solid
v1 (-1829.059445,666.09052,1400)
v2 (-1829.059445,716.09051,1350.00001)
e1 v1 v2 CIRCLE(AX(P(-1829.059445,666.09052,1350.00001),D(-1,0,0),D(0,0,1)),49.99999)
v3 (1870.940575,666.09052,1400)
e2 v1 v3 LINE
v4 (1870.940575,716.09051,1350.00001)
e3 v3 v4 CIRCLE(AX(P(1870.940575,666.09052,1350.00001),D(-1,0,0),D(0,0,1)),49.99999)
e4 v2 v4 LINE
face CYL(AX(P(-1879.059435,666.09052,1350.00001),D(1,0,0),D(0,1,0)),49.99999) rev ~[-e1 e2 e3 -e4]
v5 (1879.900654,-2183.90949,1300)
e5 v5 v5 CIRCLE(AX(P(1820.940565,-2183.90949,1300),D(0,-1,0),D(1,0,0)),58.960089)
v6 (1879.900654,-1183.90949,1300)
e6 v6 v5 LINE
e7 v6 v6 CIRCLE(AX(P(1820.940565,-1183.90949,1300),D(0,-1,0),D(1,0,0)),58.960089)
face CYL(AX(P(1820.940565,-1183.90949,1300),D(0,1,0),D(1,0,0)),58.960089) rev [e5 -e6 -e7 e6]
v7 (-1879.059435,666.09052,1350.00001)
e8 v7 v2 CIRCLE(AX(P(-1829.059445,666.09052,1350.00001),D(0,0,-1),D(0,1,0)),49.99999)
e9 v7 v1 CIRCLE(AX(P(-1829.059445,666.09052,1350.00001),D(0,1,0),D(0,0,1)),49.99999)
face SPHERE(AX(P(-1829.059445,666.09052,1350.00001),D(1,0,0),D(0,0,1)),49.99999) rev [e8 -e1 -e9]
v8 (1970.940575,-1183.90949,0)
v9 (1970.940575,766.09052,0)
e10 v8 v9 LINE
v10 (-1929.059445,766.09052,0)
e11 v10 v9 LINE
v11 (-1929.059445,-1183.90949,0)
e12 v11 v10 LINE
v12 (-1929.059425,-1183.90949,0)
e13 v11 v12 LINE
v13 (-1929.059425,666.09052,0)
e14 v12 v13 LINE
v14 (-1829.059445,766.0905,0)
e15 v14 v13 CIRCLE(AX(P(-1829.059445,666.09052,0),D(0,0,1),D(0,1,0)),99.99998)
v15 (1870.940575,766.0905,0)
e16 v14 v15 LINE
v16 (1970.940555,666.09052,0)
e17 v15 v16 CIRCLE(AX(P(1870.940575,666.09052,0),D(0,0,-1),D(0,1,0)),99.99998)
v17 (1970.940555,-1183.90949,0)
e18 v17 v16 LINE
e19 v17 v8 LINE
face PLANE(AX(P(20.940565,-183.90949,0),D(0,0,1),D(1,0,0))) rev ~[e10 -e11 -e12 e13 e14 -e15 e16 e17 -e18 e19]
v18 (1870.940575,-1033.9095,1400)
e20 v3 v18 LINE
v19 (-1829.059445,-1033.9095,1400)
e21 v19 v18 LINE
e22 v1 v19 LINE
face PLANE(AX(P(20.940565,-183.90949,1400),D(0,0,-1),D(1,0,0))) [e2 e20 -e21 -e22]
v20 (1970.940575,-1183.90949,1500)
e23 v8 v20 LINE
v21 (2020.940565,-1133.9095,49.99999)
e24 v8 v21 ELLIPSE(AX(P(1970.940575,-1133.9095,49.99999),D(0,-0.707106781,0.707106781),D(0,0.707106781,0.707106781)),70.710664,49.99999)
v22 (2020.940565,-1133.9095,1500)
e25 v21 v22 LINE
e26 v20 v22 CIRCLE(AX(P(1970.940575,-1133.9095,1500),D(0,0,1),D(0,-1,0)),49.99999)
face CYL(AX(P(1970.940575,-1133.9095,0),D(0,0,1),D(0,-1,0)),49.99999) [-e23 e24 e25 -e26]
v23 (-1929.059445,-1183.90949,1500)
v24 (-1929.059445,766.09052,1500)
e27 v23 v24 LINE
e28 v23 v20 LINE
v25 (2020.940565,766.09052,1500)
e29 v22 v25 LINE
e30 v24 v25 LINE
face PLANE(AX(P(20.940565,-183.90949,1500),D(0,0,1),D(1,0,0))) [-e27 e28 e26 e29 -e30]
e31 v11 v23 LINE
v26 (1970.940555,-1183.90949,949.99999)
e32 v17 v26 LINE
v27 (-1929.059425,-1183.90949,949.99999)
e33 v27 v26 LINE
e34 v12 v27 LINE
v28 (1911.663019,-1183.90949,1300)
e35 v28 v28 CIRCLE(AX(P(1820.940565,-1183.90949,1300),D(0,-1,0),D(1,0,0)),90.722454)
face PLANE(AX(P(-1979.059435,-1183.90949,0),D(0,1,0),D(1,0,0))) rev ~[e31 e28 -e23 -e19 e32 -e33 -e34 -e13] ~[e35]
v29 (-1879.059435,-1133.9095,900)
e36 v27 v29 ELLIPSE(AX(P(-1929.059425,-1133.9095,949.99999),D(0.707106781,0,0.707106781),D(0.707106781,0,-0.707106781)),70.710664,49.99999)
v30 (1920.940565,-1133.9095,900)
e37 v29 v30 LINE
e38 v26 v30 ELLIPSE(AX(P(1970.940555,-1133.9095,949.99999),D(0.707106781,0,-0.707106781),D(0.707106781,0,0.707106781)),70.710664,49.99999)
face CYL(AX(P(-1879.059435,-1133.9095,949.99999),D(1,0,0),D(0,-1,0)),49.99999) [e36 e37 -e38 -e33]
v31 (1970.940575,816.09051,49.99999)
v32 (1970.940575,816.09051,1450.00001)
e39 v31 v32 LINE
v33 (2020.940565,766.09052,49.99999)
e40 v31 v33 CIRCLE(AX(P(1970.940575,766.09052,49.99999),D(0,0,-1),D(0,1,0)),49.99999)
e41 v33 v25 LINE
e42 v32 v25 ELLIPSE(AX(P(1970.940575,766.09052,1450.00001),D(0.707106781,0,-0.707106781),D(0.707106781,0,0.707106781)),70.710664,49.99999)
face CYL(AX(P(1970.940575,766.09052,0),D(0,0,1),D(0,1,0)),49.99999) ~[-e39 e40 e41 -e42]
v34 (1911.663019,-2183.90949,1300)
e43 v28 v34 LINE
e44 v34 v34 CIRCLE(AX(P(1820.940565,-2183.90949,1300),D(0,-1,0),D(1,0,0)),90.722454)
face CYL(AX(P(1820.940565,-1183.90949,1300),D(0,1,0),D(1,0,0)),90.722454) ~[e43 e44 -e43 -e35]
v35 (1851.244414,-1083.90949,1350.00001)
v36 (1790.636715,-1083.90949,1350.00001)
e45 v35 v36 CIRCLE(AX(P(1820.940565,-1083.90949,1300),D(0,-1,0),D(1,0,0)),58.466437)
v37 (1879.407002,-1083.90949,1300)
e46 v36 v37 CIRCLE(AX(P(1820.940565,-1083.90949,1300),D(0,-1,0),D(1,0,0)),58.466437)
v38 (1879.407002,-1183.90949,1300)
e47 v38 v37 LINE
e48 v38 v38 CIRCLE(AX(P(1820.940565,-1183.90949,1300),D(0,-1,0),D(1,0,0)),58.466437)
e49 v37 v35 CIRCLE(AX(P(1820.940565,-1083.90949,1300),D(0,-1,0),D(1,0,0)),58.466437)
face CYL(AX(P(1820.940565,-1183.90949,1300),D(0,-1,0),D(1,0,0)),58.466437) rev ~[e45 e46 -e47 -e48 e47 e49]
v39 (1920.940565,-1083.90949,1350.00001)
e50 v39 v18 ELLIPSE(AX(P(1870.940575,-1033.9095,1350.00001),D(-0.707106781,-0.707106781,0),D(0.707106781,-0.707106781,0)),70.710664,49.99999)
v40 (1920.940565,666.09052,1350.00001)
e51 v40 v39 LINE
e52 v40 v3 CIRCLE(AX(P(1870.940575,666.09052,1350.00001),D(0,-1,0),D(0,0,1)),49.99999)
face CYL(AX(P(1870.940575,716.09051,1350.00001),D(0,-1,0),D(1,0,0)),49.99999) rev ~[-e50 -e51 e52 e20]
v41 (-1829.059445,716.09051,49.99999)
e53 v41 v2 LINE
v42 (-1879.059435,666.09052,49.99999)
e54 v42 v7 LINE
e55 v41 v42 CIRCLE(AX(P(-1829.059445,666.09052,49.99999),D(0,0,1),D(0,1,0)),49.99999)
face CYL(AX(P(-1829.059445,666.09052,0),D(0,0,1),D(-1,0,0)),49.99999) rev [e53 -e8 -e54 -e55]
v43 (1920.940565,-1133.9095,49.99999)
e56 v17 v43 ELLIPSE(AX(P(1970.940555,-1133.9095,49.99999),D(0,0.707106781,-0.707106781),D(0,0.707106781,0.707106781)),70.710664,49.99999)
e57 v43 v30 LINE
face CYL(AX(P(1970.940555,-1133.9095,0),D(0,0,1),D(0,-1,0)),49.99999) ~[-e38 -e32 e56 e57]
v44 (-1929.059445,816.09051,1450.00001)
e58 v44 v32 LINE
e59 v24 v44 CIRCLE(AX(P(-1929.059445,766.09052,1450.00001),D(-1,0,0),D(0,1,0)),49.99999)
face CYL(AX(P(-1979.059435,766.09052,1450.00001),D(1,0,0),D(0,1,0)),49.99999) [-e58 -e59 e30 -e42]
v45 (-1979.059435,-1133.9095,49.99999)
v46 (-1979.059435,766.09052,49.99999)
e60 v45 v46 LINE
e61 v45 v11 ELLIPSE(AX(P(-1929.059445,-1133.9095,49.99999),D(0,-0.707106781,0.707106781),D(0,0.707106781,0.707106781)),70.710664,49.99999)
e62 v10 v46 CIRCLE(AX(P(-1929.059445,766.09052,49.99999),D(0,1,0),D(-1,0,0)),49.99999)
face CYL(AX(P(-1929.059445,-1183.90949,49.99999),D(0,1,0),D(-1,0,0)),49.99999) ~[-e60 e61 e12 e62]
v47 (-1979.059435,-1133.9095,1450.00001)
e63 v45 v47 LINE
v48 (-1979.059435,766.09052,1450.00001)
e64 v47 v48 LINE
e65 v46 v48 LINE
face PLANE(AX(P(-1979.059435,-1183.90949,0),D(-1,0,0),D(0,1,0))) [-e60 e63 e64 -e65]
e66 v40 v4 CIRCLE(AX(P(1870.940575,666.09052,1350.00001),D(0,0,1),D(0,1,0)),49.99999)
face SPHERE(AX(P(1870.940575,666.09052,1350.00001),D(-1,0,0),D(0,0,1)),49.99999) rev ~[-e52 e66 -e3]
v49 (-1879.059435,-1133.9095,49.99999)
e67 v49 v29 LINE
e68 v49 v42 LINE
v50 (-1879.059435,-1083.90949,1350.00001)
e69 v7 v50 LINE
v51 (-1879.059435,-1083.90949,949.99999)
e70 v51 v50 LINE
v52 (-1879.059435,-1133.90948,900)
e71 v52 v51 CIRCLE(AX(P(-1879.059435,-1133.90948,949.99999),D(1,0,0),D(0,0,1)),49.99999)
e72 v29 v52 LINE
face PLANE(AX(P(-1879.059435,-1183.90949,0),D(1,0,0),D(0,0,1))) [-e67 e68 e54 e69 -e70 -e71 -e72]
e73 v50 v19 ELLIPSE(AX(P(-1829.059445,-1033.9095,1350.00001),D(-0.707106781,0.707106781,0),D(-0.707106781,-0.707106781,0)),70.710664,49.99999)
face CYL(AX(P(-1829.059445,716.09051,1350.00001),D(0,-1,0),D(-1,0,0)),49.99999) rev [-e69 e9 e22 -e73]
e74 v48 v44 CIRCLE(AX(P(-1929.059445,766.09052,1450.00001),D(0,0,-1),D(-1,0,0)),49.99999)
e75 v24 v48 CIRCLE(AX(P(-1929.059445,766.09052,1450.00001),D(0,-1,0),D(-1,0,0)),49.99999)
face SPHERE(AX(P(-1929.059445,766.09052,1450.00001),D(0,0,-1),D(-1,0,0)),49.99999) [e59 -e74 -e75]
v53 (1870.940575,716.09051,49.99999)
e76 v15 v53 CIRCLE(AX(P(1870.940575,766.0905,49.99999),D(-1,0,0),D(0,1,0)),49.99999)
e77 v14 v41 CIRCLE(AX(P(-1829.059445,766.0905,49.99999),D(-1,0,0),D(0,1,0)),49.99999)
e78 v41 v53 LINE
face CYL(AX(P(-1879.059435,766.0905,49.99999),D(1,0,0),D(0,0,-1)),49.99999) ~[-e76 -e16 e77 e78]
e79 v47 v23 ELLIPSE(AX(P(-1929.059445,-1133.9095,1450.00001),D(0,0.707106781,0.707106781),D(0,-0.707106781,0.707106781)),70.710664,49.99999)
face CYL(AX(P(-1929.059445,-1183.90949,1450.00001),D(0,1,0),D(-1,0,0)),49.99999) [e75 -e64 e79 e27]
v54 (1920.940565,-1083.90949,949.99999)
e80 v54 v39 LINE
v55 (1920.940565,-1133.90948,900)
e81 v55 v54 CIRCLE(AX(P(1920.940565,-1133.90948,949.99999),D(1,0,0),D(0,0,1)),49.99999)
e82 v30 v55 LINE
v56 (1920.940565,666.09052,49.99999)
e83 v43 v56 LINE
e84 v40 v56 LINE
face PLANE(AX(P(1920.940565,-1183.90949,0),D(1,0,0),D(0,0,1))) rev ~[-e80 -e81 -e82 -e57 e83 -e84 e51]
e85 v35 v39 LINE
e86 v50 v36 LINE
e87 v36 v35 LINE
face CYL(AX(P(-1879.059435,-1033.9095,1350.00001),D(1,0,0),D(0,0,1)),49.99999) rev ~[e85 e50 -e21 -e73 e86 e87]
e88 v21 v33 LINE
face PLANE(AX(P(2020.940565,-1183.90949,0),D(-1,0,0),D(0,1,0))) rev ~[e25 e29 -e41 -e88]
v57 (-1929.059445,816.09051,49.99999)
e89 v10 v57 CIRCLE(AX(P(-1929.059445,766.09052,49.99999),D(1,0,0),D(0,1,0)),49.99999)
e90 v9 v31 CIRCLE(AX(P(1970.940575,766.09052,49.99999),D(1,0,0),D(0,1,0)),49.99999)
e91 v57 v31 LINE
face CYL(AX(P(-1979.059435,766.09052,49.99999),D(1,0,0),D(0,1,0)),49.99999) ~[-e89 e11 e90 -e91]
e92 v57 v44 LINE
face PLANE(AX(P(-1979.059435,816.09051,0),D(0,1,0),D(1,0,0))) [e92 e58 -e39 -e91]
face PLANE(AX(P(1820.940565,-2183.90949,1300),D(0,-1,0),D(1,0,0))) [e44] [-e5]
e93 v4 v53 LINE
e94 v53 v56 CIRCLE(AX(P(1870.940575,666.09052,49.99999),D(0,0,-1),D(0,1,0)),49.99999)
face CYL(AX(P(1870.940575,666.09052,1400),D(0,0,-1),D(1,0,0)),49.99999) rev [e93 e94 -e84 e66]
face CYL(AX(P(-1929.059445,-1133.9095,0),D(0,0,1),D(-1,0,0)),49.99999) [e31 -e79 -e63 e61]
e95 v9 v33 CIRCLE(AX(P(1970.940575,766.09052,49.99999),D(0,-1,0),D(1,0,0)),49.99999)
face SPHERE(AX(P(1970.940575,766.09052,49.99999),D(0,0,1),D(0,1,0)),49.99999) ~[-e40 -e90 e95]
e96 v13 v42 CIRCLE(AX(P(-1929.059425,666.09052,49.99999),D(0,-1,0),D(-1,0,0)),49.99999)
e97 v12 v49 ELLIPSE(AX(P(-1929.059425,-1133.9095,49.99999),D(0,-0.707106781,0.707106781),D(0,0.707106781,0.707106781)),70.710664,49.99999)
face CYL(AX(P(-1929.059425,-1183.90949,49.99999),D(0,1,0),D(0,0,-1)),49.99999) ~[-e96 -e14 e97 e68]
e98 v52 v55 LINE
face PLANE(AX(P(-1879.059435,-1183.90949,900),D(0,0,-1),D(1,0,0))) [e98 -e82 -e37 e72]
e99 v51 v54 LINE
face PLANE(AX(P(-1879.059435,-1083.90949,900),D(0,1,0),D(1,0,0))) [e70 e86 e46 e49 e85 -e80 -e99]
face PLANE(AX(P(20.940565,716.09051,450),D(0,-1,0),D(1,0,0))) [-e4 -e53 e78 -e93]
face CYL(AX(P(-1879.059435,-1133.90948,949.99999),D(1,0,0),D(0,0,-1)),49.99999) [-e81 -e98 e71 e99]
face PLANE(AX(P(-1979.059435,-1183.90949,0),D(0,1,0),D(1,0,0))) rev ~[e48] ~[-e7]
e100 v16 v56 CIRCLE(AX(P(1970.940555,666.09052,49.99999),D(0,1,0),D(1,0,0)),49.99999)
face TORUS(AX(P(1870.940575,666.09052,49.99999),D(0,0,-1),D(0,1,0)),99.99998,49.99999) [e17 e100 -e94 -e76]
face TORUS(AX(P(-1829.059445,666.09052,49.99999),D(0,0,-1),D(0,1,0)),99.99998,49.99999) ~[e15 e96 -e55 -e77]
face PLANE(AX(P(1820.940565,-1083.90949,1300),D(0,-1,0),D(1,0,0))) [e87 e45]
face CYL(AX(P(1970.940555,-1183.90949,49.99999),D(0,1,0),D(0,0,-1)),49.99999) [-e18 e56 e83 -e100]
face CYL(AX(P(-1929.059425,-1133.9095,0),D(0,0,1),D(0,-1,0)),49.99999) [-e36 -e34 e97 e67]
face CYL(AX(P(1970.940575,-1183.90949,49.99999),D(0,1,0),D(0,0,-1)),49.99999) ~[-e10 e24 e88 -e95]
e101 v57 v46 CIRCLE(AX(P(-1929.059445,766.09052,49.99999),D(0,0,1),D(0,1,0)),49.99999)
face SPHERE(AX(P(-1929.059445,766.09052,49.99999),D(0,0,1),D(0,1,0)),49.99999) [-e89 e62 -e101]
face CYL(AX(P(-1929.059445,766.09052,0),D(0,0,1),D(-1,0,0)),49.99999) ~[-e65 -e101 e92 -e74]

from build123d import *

# Parameters (mm, degrees)
F0_W      = 4000
F0_H      = 2000
F1_DEPTH  = 1500
F2_W      = 3800
F2_H      = 900
F3_DEPTH  = 1900
F4_W      = 3800
F4_H      = 1800
F5_DEPTH  = 500
F6_R      = 90.7224543957
F6_R_2    = 58.9600889745
F7_DEPTH  = 1000
F8_R      = 49.99999
F9_R      = 58.4664374667
F10_DEPTH = 100


# Not quite as in the source:
# - a fillet or chamfer is up to 0.001 mm smaller than in the source, because OpenCascade refuses the exact size


with BuildPart() as f1:
    # F0 (on Top) → F1 (new body)
    with BuildSketch(Plane.XY):
        with Locations((20.9405645728, -183.9094895178)):
            Rectangle(F0_W, F0_H)
    extrude(amount=F1_DEPTH)

    # F2 (on face) → F3 (cut)
    with BuildSketch(Plane.XZ.offset(1183.9094895178)):
        with Locations((20.9405645728, 450)):
            Rectangle(F2_W, F2_H)
    extrude(amount=-F3_DEPTH, mode=Mode.SUBTRACT)

    # F4 (on face) → F5 (cut)
    with BuildSketch(Plane(origin=(0, 0, 900), x_dir=(1, 0, 0), z_dir=(0, 0, -1))):
        with Locations((20.9405645728, 183.9094895178)):
            Rectangle(F4_W, F4_H)
    extrude(amount=-F5_DEPTH, mode=Mode.SUBTRACT)

    # F6 (on face) → F7 (join)
    with BuildSketch(Plane.XZ.offset(1183.9094895178)):
        with Locations((1820.9405645728, 1300)):
            Circle(F6_R)
        with Locations((1820.9405645728, 1300)):
            Circle(F6_R_2, mode=Mode.SUBTRACT)
    extrude(amount=F7_DEPTH)

    # F8 (radius 50 in the source; OpenCascade refuses exactly that, so slightly less here)
    f8_edges = [f1.edges().sort_by_distance(p)[0] for p in [
        (20.940565, -1183.90949, 900),
        (-1979.059435, -1183.90949, 750),
        (2020.940565, -1183.90949, 750),
        (2020.940565, 816.09051, 750),
        (-1979.059435, 816.09051, 750),
        (20.940565, -1083.90949, 900),
        (20.940565, 816.09051, 0),
        (-1979.059435, -183.90949, 0),
        (-1979.059435, -183.90949, 1500),
        (-1879.059435, -233.90949, 0),
        (1920.940565, -233.90949, 0),
        (2020.940565, -183.90949, 0),
        (1920.940565, -1183.90949, 450),
        (-1879.059435, -1183.90949, 450),
        (20.940565, 716.09051, 1400),
        (-1879.059435, -183.90949, 1400),
        (1920.940565, -183.90949, 1400),
        (20.940565, -1083.90949, 1400),
        (20.940565, 816.09051, 1500),
        (1920.940565, 716.09051, 700),
        (-1879.059435, 716.09051, 700),
        (20.940565, 716.09051, 0),
    ]]
    fillet(f8_edges, radius=F8_R)

    # F9 (on face) → F10 (cut)
    with BuildSketch(Plane.XZ.offset(1183.9094895178)):
        with Locations((1820.9405645728, 1300)):
            Circle(F9_R)
    extrude(amount=-F10_DEPTH, mode=Mode.SUBTRACT)


solid = f1.part
